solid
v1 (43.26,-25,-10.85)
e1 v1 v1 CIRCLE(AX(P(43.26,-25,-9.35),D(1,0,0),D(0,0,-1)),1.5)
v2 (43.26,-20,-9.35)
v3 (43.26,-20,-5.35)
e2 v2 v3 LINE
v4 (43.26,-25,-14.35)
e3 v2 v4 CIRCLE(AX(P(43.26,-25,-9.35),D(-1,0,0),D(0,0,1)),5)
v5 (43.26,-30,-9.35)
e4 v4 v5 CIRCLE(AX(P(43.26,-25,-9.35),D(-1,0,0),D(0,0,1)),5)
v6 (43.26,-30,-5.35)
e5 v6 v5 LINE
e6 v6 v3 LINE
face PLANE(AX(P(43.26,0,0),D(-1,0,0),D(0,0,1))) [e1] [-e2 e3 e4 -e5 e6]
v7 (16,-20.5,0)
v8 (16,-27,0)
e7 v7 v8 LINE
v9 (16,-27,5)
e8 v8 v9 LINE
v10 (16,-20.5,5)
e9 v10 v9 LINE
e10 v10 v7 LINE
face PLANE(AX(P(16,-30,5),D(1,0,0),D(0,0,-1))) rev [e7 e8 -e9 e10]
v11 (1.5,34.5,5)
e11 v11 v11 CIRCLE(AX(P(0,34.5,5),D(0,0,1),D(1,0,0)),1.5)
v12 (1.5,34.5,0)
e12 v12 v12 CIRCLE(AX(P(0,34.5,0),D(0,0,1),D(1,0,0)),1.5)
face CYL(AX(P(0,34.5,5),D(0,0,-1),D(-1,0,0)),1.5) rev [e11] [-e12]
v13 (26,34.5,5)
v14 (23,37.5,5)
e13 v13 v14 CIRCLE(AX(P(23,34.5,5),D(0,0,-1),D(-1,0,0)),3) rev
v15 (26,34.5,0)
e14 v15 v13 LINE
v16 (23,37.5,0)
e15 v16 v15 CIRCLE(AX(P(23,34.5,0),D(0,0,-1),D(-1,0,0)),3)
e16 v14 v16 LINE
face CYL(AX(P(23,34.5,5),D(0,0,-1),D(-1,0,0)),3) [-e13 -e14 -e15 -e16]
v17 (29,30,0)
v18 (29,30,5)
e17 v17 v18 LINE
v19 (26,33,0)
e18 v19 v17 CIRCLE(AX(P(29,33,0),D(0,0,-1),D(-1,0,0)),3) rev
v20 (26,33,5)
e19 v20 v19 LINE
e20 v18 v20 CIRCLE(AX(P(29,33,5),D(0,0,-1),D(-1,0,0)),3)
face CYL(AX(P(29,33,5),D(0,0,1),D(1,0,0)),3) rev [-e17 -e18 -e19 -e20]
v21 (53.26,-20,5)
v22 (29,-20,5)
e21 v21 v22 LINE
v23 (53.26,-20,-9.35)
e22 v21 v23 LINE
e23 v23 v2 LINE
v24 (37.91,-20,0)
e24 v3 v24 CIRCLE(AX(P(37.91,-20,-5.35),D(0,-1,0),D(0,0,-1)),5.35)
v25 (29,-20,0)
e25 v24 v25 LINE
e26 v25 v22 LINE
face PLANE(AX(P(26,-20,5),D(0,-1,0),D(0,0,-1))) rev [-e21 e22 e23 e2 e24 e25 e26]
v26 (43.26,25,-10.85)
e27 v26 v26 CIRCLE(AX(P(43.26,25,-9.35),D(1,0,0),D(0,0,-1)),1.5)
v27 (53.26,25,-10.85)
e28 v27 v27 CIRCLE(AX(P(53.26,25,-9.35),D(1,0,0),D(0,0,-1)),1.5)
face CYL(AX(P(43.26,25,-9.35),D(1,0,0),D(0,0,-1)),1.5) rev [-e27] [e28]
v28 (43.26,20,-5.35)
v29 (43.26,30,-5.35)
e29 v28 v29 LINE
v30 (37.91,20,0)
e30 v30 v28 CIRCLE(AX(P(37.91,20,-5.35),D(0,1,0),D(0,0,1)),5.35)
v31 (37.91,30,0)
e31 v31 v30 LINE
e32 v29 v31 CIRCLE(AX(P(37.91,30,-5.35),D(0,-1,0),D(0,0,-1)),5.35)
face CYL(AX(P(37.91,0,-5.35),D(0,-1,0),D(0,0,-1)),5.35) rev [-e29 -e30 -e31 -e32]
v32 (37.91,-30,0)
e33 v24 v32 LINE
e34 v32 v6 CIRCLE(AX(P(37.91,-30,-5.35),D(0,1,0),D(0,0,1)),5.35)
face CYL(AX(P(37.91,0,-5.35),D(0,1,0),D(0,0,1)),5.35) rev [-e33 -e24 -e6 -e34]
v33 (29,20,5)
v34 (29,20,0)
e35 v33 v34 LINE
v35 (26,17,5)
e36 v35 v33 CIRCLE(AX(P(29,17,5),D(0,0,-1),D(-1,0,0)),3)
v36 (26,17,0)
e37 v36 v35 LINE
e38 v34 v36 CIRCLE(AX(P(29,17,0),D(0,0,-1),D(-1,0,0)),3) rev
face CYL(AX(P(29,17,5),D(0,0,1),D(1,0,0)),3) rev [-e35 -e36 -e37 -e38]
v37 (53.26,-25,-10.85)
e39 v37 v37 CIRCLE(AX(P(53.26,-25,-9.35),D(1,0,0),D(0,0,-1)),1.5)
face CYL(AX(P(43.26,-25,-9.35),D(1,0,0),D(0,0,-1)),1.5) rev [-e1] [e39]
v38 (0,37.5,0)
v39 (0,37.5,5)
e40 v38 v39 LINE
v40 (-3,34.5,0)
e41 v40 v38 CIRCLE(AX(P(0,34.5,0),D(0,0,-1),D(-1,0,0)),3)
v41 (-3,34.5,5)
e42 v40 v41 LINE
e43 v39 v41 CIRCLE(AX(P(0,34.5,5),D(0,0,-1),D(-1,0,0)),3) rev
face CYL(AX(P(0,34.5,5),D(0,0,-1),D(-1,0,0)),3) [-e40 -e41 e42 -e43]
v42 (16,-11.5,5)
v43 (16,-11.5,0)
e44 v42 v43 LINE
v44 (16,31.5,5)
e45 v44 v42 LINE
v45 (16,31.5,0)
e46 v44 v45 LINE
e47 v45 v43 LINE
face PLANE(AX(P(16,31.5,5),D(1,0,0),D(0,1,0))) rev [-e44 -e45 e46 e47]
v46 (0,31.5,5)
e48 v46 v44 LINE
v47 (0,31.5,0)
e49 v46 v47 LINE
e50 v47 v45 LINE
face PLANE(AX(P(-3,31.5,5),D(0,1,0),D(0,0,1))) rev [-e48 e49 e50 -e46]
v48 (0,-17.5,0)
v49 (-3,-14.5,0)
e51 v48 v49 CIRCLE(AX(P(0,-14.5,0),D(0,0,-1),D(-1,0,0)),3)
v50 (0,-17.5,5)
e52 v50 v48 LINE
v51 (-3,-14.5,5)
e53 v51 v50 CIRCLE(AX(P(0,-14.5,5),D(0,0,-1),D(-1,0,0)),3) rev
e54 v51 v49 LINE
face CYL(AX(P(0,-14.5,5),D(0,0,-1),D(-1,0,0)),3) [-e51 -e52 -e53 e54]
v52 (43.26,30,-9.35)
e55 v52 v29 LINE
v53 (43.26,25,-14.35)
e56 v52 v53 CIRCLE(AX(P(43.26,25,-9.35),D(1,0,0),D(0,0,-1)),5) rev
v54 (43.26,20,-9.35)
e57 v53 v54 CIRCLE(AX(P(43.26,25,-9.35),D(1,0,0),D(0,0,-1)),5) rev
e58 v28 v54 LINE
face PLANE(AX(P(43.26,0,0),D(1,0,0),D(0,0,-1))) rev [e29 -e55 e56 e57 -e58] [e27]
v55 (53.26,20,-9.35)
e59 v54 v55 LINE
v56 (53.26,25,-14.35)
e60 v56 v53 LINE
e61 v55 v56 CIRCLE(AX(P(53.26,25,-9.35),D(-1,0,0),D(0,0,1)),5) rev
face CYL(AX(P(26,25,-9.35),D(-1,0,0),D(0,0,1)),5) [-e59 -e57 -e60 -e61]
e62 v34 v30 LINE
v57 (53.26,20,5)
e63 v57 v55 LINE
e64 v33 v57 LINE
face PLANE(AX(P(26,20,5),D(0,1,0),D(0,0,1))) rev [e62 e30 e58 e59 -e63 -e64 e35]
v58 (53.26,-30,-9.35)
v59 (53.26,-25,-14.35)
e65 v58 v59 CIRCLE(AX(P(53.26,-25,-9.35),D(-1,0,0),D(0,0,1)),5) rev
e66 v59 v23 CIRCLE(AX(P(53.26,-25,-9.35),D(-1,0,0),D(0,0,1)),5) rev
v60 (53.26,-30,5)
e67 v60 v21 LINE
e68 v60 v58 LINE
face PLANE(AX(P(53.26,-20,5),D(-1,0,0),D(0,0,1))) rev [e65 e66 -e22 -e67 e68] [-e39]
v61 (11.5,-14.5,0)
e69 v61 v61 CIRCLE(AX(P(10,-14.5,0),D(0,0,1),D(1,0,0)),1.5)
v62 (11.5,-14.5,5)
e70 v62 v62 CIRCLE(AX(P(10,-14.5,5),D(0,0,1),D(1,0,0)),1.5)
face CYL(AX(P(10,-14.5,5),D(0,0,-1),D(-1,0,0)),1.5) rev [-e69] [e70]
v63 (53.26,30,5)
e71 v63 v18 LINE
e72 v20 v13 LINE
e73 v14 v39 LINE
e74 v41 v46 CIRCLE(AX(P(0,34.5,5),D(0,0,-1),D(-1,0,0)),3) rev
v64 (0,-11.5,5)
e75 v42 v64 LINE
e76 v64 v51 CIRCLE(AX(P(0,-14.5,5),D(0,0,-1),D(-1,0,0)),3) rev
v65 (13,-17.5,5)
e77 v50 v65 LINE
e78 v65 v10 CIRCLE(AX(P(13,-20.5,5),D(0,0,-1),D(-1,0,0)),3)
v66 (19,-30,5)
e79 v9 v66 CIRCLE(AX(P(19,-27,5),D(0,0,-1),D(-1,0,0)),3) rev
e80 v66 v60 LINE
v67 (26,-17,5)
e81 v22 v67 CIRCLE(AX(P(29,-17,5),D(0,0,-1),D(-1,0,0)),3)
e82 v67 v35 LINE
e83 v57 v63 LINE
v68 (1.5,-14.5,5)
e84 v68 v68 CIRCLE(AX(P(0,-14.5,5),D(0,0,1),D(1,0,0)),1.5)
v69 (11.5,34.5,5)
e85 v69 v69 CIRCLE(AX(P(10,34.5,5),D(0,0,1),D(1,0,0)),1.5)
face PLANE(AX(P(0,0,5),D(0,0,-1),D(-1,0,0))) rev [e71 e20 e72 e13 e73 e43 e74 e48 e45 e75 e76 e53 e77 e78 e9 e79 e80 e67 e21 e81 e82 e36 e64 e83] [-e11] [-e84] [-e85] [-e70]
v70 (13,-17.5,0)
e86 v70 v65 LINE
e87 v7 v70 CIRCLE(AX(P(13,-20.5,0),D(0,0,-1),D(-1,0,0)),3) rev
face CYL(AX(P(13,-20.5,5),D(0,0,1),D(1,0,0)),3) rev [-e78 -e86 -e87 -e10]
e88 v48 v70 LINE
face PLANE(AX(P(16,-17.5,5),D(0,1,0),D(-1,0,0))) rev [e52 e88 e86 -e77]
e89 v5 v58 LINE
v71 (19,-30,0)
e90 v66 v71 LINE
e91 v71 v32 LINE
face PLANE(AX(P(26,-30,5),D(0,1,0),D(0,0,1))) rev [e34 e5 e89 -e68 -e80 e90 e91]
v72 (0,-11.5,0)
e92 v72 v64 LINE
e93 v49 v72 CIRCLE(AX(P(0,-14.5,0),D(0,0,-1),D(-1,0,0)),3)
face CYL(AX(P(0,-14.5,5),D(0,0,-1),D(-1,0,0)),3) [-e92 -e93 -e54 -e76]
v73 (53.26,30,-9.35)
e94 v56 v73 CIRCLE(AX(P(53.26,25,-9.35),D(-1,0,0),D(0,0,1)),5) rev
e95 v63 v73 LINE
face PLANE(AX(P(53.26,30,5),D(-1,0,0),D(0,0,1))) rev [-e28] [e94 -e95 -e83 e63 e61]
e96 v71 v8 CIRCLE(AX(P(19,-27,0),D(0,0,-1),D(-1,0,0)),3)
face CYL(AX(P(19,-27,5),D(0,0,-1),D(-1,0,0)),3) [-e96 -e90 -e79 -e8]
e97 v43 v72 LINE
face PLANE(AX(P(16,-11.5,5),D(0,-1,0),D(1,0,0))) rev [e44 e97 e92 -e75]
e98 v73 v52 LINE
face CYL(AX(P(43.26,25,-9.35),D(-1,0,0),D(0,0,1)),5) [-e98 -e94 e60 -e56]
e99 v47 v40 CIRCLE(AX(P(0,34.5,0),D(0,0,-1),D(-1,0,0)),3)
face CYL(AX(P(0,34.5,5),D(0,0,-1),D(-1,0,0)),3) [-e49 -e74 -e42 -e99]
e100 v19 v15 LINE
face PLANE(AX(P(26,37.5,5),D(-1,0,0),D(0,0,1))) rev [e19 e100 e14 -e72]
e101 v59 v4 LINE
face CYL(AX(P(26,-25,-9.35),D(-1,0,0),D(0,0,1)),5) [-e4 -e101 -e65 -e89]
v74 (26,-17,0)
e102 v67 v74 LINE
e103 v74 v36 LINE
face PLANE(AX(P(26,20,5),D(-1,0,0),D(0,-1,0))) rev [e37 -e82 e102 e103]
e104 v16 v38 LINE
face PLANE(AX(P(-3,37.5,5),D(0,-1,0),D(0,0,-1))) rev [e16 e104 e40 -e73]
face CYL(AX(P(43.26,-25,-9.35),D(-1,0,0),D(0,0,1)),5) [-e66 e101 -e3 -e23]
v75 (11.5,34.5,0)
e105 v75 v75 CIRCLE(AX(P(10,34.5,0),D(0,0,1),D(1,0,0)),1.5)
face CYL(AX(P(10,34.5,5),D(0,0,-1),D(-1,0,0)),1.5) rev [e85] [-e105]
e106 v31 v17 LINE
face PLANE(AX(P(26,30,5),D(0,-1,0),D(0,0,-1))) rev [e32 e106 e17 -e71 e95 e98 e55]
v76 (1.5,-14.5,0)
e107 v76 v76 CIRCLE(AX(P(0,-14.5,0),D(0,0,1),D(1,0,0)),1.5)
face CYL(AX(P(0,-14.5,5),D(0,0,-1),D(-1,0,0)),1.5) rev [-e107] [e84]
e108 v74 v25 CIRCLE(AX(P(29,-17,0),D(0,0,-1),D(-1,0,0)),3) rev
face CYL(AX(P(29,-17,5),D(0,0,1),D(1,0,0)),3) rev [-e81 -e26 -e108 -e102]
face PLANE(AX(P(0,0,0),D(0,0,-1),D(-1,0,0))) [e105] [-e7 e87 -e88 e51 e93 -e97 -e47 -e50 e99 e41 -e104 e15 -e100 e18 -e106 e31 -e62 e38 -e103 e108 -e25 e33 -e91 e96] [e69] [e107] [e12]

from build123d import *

# Parameters (mm, degrees)
SKETCH_1_R      = 1.5
EXTRUDE_1_DEPTH = 5
FILLET_1_R      = 3
SKETCH_2_W      = 14.35
SKETCH_2_H      = 10
SKETCH_2_R      = 1.5
EXTRUDE_2_DEPTH = 10
FILLET_2_R      = 5
FILLET_4_R      = 5.35


with BuildPart() as part:
    # 草图1 → 凸台-拉伸1 (new body)
    with BuildSketch(Plane.XY):
        Polygon((-3, 37.5), (-3, 31.5), (16, 31.5), (16, -11.5), (-3, -11.5), (-3, -17.5), (16, -17.5), (16, -30), (26, -30), (53.26, -30), (53.26, -20), (26, -20), (26, -17.5), (26, 20), (53.26, 20), (53.26, 30), (26, 30), (26, 37.5), align=None)
        with Locations((0, -14.5)):
            Circle(SKETCH_1_R, mode=Mode.SUBTRACT)
        with Locations((0, 34.5)):
            Circle(SKETCH_1_R, mode=Mode.SUBTRACT)
        with Locations((10, 34.5)):
            Circle(SKETCH_1_R, mode=Mode.SUBTRACT)
        with Locations((10, -14.5)):
            Circle(SKETCH_1_R, mode=Mode.SUBTRACT)
    extrude(amount=EXTRUDE_1_DEPTH)

    # 圆角1
    fillet_1_edges = [part.edges().sort_by_distance(p)[0] for p in [
        (26, 20, 2.5),
        (26, -20, 2.5),
        (26, 30, 2.5),
        (26, 37.5, 2.5),
        (16, -30, 2.5),
        (16, -17.5, 2.5),
        (-3, -17.5, 2.5),
        (-3, -11.5, 2.5),
        (-3, 37.5, 2.5),
        (-3, 31.5, 2.5),
    ]]
    fillet(fillet_1_edges, radius=FILLET_1_R - 0.0001)  # a hair under: the kernel refuses the full size

    # 草图2 → 凸台-拉伸2 (add)
    # profile 1 of 2: a face of its own
    with BuildSketch(Plane(origin=(53.26, 0, 0), x_dir=(0, 0, -1), z_dir=(1, 0, 0))):
        with Locations((7.175, 25)):
            Rectangle(SKETCH_2_W, SKETCH_2_H)
        with Locations((9.35, 25)):
            Circle(SKETCH_2_R, mode=Mode.SUBTRACT)
    # profile 2 of 2: a face of its own
    with BuildSketch(Plane(origin=(53.26, 0, 0), x_dir=(0, 0, -1), z_dir=(1, 0, 0))):
        with Locations((7.175, -25)):
            Rectangle(SKETCH_2_W, SKETCH_2_H)
        with Locations((9.35, -25)):
            Circle(SKETCH_2_R, mode=Mode.SUBTRACT)
    extrude(amount=-EXTRUDE_2_DEPTH)

    # 圆角2
    fillet_2_edges = [part.edges().sort_by_distance(p)[0] for p in [
        (48.26, 30, -14.35),
        (48.26, 20, -14.35),
        (48.26, -20, -14.35),
        (48.26, -30, -14.35),
    ]]
    fillet(fillet_2_edges, radius=FILLET_2_R - 0.0001)  # a hair under: the kernel refuses the full size

    # 圆角4
    fillet_4_edges = [part.edges().sort_by_distance(p)[0] for p in [
        (43.26, 25, 0),
        (43.26, -25, 0),
    ]]
    fillet(fillet_4_edges, radius=FILLET_4_R)


solid = part.part
